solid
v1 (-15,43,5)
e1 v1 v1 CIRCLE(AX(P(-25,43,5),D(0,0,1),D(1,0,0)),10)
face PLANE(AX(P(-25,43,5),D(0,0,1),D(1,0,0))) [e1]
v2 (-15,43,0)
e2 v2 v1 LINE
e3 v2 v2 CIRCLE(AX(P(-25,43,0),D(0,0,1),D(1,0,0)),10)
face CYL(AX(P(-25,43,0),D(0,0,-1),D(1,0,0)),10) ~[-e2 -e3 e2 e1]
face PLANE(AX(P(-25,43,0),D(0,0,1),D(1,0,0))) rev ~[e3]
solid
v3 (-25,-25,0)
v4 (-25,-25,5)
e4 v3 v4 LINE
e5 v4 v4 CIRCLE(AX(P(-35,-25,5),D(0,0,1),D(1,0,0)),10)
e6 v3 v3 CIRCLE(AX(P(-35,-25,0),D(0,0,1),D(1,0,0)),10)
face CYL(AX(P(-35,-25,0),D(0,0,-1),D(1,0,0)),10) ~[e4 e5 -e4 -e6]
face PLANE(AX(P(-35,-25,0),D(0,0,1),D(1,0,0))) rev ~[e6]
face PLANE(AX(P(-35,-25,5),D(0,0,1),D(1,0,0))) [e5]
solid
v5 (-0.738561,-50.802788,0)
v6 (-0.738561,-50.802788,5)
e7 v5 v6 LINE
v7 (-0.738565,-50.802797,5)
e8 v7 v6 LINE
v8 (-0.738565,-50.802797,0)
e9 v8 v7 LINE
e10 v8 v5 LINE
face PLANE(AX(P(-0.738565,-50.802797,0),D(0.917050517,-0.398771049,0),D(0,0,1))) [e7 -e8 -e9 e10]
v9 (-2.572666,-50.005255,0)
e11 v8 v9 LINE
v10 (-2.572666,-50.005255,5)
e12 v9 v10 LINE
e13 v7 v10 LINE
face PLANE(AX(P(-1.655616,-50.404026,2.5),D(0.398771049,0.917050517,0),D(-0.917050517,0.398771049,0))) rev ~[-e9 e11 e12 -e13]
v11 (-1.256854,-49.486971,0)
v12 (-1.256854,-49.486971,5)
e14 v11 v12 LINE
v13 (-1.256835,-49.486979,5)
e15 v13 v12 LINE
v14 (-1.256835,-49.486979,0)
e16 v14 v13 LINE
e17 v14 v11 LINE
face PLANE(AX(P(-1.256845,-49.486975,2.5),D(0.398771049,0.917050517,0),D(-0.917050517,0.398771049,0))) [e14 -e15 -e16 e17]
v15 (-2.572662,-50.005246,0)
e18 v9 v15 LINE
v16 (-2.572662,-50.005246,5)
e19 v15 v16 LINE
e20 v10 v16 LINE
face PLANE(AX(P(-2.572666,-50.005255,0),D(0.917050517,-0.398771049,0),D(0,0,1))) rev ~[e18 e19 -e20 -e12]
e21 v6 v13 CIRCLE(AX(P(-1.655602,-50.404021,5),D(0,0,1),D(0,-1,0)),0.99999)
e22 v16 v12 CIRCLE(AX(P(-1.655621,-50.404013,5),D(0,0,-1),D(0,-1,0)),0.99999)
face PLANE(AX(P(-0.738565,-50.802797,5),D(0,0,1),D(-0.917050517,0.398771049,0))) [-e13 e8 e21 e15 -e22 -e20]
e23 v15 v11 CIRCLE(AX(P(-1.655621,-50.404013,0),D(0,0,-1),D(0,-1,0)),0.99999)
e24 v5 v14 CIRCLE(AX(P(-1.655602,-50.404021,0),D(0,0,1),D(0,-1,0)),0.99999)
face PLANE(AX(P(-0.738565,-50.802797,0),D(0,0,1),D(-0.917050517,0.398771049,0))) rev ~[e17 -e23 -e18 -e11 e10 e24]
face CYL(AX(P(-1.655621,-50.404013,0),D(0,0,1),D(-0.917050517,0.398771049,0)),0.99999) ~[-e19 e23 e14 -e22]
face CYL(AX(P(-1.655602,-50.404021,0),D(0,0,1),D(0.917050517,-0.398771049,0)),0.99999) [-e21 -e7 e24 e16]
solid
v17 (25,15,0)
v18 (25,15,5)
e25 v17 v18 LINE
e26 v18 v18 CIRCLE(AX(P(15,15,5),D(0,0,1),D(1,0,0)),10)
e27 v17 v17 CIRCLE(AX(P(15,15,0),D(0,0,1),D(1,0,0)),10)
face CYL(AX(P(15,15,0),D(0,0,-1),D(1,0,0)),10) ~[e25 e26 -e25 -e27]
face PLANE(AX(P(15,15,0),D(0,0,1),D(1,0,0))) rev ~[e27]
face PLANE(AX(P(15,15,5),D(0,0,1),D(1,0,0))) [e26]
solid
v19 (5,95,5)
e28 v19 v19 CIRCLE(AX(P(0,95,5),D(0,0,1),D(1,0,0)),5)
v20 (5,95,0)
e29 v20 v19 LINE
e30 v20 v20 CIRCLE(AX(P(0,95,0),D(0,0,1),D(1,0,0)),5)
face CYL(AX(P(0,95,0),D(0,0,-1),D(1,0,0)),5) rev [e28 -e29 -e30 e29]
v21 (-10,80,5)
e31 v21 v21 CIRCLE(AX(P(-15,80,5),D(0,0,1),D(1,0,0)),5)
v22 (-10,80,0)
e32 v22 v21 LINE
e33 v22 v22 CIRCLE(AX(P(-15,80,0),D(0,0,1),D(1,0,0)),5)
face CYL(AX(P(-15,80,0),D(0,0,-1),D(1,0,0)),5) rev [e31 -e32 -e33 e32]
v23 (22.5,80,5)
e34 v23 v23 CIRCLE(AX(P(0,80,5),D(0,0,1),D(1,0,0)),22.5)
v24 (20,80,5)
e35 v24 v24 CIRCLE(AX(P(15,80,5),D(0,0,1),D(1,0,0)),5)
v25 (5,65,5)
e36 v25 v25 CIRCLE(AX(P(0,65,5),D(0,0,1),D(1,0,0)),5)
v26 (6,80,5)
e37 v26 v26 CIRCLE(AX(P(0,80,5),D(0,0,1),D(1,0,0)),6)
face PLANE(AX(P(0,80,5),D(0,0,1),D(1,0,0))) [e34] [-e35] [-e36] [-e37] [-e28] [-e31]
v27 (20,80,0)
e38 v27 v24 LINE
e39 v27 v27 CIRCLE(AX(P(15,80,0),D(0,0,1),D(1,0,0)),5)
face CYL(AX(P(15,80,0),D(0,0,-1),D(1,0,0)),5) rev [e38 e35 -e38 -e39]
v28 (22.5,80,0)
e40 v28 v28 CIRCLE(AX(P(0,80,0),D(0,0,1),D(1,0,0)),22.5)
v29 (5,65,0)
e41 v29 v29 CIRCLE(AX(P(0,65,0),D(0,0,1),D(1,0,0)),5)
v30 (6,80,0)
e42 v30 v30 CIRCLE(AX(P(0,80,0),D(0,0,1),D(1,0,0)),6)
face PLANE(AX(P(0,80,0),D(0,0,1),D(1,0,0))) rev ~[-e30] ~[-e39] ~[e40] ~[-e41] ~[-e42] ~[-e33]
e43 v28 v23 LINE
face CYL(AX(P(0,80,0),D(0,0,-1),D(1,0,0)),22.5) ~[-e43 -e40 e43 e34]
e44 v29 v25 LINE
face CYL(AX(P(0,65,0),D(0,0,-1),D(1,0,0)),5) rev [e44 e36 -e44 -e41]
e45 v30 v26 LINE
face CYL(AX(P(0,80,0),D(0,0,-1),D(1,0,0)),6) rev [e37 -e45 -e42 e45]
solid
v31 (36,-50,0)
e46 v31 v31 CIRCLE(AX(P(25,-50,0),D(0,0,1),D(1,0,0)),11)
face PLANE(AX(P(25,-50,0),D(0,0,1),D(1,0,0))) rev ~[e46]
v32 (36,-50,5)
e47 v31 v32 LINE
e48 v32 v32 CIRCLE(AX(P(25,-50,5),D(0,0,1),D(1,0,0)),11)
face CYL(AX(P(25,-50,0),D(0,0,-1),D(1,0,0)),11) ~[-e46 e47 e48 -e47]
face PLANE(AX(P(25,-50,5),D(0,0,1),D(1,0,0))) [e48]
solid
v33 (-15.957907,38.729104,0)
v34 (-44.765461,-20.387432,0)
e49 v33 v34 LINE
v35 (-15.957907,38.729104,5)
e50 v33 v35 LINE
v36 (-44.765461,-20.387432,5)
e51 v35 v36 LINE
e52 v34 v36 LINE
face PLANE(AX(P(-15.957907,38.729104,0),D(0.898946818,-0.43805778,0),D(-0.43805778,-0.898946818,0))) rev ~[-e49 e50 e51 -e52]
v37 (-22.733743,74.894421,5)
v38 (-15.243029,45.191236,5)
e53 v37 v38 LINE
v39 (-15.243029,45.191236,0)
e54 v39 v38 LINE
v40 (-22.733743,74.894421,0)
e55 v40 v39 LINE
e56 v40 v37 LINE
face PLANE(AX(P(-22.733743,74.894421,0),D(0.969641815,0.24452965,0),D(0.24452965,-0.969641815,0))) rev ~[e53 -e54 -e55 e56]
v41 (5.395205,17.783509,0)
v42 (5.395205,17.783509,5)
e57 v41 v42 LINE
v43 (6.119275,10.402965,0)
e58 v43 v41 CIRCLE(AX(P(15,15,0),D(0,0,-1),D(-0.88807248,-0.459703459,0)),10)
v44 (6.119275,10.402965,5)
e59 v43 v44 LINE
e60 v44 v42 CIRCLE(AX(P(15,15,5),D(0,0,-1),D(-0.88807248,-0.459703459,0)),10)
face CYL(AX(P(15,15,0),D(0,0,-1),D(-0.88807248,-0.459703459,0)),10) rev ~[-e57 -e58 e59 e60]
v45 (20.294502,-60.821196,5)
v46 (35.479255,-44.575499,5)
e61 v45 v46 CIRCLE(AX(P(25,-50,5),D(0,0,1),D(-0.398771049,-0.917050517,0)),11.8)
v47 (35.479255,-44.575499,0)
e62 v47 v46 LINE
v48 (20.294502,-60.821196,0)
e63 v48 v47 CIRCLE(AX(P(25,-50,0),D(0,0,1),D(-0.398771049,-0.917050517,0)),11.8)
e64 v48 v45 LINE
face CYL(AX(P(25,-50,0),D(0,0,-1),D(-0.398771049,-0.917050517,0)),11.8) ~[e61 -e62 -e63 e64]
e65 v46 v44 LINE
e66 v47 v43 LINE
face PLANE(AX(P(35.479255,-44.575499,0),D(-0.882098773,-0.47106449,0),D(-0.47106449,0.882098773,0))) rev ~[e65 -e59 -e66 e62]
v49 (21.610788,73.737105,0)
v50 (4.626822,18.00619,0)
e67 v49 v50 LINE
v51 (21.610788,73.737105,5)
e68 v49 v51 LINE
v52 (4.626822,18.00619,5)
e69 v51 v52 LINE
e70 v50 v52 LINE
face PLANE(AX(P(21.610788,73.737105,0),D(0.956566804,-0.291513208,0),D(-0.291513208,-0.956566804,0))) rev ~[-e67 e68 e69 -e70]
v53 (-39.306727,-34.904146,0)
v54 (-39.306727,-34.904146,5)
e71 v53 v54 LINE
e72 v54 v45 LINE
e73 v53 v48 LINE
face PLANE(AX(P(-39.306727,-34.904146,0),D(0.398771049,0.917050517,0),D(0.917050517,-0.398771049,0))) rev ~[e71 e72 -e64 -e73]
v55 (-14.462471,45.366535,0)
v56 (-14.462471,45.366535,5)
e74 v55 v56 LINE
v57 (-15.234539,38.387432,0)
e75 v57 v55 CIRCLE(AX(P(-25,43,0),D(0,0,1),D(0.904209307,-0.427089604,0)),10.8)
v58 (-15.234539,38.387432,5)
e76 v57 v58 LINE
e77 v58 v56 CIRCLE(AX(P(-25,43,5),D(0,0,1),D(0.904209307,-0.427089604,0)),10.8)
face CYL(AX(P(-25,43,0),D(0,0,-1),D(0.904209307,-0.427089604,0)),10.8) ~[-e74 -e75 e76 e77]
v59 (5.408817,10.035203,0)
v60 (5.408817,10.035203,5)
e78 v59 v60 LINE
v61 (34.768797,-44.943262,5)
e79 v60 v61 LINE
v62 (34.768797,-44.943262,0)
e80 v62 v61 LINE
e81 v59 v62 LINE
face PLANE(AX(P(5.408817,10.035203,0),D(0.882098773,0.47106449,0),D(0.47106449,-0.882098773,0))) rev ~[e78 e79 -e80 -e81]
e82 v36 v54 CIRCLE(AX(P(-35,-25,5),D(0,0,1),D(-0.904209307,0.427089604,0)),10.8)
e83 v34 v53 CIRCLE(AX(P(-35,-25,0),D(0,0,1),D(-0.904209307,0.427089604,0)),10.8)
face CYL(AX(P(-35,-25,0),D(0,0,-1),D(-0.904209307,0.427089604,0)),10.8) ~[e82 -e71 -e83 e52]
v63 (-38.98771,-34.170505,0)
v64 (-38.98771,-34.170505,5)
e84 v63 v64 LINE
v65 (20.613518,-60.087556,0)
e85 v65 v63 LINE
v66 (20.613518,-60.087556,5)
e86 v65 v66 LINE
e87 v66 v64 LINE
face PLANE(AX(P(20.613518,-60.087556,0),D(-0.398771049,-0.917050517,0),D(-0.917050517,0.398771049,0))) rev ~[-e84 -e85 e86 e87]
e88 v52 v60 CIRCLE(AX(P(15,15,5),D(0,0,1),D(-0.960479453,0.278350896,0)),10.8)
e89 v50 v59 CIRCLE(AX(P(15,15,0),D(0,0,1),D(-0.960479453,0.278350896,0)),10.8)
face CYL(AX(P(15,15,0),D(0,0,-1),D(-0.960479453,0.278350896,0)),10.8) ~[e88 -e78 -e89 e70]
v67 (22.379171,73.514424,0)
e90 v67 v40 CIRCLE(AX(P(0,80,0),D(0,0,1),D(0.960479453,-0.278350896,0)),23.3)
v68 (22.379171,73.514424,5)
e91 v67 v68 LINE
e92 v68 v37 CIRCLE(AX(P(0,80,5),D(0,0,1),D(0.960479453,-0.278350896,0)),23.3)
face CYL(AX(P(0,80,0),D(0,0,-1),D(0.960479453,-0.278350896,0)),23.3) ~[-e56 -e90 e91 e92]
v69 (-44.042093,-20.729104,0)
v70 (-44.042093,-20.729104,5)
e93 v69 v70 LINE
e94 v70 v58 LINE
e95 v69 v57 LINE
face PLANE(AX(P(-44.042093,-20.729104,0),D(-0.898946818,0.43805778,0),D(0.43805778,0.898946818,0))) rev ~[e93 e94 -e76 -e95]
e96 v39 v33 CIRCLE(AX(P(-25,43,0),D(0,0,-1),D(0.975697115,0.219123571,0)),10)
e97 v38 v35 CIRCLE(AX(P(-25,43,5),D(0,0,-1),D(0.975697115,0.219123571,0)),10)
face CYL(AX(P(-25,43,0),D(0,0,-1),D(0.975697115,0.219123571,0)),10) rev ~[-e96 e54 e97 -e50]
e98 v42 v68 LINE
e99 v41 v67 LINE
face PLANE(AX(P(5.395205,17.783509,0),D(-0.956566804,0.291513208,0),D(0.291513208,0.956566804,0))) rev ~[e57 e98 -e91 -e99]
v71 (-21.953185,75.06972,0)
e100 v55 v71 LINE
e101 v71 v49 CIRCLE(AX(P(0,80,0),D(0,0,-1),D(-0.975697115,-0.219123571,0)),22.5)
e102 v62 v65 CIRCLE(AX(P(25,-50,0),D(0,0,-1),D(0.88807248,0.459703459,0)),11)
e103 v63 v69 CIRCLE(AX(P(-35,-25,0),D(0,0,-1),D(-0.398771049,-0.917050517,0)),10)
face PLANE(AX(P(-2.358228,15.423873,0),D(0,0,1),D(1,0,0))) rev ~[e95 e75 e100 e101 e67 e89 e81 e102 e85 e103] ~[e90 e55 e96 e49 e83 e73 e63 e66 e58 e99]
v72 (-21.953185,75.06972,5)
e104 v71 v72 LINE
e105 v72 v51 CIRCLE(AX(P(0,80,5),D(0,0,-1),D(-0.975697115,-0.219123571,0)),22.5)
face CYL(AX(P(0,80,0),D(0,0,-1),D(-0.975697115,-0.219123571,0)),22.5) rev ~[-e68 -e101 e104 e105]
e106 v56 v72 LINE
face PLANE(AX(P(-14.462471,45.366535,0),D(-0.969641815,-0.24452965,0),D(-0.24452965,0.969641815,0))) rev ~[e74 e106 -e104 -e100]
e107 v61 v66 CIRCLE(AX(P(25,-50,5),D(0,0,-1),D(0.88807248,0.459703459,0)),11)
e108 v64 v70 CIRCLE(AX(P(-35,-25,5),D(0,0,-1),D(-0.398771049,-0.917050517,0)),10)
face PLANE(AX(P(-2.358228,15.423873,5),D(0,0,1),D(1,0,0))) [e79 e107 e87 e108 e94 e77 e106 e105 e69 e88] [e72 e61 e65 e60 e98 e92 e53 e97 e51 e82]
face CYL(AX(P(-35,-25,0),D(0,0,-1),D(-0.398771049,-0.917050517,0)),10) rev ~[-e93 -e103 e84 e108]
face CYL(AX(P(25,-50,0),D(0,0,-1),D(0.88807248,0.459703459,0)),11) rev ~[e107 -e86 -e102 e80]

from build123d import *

# Parameters (mm, degrees)
F0_R     = 10
F1_DEPTH = 5
F0_R_2   = 11
F0_R_3   = 22.5
F0_R_4   = 5
F0_R_5   = 6
F3_DEPTH = 5
F4_W     = 2
F4_H     = 5
F5_DEPTH = 1
F6_R     = 0.99999


# Not quite as in the source:
# - a fillet or chamfer is up to 0.001 mm smaller than in the source, because OpenCascade refuses the exact size


with BuildPart() as f1:
    # F0 (on Top) → F1 (new body)
    with BuildSketch(Plane.XY):
        with Locations((-25, 43)):
            Circle(F0_R)
    extrude(amount=F1_DEPTH)


with BuildPart() as f1b:
    # F0 (on Top) → F1, piece 2 (new body)
    with BuildSketch(Plane.XY):
        with Locations((15, 15)):
            Circle(F0_R)
    extrude(amount=F1_DEPTH)


with BuildPart() as f1c:
    # F0 (on Top) → F1, piece 3 (new body)
    with BuildSketch(Plane.XY):
        with Locations((-35, -25)):
            Circle(F0_R)
    extrude(amount=F1_DEPTH)


with BuildPart() as f1d:
    # F0 (on Top) → F1, piece 4 (new body)
    with BuildSketch(Plane.XY):
        with Locations((25, -50)):
            Circle(F0_R_2)
    extrude(amount=F1_DEPTH)


with BuildPart() as f1e:
    # F0 (on Top) → F1, piece 5 (new body)
    with BuildSketch(Plane.XY):
        with Locations((0, 80)):
            Circle(F0_R_3)
        with Locations((-15, 80)):
            Circle(F0_R_4, mode=Mode.SUBTRACT)
        with Locations((0, 65)):
            Circle(F0_R_4, mode=Mode.SUBTRACT)
        with Locations((0, 80)):
            Circle(F0_R_5, mode=Mode.SUBTRACT)
        with Locations((15, 80)):
            Circle(F0_R_4, mode=Mode.SUBTRACT)
        with Locations((0, 95)):
            Circle(F0_R_4, mode=Mode.SUBTRACT)
    extrude(amount=F1_DEPTH)


with BuildPart() as f3:
    # F2 (on Top) → F3 (new body)
    with BuildSketch(Plane.XY):
        with BuildLine():
            ThreePointArc((-15.2430288474, 45.1912357077), (-15.0606342981, 41.9004503453), (-15.9579069335, 38.7291039608))
            Line((-15.9579069335, 38.7291039608), (-44.7654605118, -20.3874322777))
            ThreePointArc((-44.7654605118, -20.3874322777), (-45.1089247172, -28.8012683491), (-39.3067273264, -34.9041455833))
            Line((-39.3067273264, -34.9041455833), (20.2945016249, -60.8211961003))
            ThreePointArc((20.2945016249, -60.8211961003), (33.6205994102, -58.0576215975), (35.4792552674, -44.5754991896))
            Line((35.4792552674, -44.5754991896), (6.1192751972, 10.4029654149))
            ThreePointArc((6.1192751972, 10.4029654149), (5.0477785416, 14.0236352918), (5.3952054736, 17.7835089554))
            Line((5.3952054736, 17.7835089554), (22.3791712466, 73.5144241338))
            ThreePointArc((22.3791712466, 73.5144241338), (0.7124099554, 103.2891062958), (-22.7337427856, 74.8944208011))
            Line((-22.7337427856, 74.8944208011), (-15.2430288474, 45.1912357077))
        make_face()
        with BuildLine():
            ThreePointArc((-21.9531850934, 75.0697196577), (0.6879495277, 102.4894803285), (21.6107876845, 73.7371048503))
            Line((21.6107876845, 73.7371048503), (4.6268219115, 18.0061896719))
            ThreePointArc((4.6268219115, 18.0061896719), (4.251600825, 13.9455261151), (5.4088172129, 10.0352026481))
            Line((5.4088172129, 10.0352026481), (34.7687972831, -44.9432619564))
            ThreePointArc((34.7687972831, -44.9432619564), (33.0361519926, -57.5113421672), (20.6135184639, -60.0875556867))
            Line((20.6135184639, -60.0875556867), (-38.9877104874, -34.1705051698))
            ThreePointArc((-38.9877104874, -34.1705051698), (-44.3601154789, -28.5196929159), (-44.0420930665, -20.7291039608))
            Line((-44.0420930665, -20.7291039608), (-15.2345394882, 38.3874322777))
            ThreePointArc((-15.2345394882, 38.3874322777), (-14.2654850419, 41.8124863729), (-14.4624711552, 45.3665345643))
            Line((-14.4624711552, 45.3665345643), (-21.9531850934, 75.0697196577))
        make_face(mode=Mode.SUBTRACT)
    extrude(amount=F3_DEPTH)


with BuildPart() as f5:
    # F4 (on face) → F5 (new body)
    with BuildSketch(Plane(origin=(-18.6956826234, -42.994308311, 0), x_dir=(-0.917050517, 0.3987710487, 0), z_dir=(0.3987710487, 0.917050517, 0))):
        with Locations((-18.5813830942, 2.5)):
            Rectangle(F4_W, F4_H)
    extrude(amount=F5_DEPTH)

    # F6 (radius 1 in the source; OpenCascade refuses exactly that, so slightly less here)
    f6_edges = [f5.edges().sort_by_distance(p)[0] for p in [
        (-2.173895, -49.088204, 2.5),
        (-0.339794, -49.885746, 2.5),
    ]]
    fillet(f6_edges, radius=F6_R)


solid = Compound([f1.part, f1b.part, f1c.part, f1d.part, f1e.part, f3.part, f5.part])
